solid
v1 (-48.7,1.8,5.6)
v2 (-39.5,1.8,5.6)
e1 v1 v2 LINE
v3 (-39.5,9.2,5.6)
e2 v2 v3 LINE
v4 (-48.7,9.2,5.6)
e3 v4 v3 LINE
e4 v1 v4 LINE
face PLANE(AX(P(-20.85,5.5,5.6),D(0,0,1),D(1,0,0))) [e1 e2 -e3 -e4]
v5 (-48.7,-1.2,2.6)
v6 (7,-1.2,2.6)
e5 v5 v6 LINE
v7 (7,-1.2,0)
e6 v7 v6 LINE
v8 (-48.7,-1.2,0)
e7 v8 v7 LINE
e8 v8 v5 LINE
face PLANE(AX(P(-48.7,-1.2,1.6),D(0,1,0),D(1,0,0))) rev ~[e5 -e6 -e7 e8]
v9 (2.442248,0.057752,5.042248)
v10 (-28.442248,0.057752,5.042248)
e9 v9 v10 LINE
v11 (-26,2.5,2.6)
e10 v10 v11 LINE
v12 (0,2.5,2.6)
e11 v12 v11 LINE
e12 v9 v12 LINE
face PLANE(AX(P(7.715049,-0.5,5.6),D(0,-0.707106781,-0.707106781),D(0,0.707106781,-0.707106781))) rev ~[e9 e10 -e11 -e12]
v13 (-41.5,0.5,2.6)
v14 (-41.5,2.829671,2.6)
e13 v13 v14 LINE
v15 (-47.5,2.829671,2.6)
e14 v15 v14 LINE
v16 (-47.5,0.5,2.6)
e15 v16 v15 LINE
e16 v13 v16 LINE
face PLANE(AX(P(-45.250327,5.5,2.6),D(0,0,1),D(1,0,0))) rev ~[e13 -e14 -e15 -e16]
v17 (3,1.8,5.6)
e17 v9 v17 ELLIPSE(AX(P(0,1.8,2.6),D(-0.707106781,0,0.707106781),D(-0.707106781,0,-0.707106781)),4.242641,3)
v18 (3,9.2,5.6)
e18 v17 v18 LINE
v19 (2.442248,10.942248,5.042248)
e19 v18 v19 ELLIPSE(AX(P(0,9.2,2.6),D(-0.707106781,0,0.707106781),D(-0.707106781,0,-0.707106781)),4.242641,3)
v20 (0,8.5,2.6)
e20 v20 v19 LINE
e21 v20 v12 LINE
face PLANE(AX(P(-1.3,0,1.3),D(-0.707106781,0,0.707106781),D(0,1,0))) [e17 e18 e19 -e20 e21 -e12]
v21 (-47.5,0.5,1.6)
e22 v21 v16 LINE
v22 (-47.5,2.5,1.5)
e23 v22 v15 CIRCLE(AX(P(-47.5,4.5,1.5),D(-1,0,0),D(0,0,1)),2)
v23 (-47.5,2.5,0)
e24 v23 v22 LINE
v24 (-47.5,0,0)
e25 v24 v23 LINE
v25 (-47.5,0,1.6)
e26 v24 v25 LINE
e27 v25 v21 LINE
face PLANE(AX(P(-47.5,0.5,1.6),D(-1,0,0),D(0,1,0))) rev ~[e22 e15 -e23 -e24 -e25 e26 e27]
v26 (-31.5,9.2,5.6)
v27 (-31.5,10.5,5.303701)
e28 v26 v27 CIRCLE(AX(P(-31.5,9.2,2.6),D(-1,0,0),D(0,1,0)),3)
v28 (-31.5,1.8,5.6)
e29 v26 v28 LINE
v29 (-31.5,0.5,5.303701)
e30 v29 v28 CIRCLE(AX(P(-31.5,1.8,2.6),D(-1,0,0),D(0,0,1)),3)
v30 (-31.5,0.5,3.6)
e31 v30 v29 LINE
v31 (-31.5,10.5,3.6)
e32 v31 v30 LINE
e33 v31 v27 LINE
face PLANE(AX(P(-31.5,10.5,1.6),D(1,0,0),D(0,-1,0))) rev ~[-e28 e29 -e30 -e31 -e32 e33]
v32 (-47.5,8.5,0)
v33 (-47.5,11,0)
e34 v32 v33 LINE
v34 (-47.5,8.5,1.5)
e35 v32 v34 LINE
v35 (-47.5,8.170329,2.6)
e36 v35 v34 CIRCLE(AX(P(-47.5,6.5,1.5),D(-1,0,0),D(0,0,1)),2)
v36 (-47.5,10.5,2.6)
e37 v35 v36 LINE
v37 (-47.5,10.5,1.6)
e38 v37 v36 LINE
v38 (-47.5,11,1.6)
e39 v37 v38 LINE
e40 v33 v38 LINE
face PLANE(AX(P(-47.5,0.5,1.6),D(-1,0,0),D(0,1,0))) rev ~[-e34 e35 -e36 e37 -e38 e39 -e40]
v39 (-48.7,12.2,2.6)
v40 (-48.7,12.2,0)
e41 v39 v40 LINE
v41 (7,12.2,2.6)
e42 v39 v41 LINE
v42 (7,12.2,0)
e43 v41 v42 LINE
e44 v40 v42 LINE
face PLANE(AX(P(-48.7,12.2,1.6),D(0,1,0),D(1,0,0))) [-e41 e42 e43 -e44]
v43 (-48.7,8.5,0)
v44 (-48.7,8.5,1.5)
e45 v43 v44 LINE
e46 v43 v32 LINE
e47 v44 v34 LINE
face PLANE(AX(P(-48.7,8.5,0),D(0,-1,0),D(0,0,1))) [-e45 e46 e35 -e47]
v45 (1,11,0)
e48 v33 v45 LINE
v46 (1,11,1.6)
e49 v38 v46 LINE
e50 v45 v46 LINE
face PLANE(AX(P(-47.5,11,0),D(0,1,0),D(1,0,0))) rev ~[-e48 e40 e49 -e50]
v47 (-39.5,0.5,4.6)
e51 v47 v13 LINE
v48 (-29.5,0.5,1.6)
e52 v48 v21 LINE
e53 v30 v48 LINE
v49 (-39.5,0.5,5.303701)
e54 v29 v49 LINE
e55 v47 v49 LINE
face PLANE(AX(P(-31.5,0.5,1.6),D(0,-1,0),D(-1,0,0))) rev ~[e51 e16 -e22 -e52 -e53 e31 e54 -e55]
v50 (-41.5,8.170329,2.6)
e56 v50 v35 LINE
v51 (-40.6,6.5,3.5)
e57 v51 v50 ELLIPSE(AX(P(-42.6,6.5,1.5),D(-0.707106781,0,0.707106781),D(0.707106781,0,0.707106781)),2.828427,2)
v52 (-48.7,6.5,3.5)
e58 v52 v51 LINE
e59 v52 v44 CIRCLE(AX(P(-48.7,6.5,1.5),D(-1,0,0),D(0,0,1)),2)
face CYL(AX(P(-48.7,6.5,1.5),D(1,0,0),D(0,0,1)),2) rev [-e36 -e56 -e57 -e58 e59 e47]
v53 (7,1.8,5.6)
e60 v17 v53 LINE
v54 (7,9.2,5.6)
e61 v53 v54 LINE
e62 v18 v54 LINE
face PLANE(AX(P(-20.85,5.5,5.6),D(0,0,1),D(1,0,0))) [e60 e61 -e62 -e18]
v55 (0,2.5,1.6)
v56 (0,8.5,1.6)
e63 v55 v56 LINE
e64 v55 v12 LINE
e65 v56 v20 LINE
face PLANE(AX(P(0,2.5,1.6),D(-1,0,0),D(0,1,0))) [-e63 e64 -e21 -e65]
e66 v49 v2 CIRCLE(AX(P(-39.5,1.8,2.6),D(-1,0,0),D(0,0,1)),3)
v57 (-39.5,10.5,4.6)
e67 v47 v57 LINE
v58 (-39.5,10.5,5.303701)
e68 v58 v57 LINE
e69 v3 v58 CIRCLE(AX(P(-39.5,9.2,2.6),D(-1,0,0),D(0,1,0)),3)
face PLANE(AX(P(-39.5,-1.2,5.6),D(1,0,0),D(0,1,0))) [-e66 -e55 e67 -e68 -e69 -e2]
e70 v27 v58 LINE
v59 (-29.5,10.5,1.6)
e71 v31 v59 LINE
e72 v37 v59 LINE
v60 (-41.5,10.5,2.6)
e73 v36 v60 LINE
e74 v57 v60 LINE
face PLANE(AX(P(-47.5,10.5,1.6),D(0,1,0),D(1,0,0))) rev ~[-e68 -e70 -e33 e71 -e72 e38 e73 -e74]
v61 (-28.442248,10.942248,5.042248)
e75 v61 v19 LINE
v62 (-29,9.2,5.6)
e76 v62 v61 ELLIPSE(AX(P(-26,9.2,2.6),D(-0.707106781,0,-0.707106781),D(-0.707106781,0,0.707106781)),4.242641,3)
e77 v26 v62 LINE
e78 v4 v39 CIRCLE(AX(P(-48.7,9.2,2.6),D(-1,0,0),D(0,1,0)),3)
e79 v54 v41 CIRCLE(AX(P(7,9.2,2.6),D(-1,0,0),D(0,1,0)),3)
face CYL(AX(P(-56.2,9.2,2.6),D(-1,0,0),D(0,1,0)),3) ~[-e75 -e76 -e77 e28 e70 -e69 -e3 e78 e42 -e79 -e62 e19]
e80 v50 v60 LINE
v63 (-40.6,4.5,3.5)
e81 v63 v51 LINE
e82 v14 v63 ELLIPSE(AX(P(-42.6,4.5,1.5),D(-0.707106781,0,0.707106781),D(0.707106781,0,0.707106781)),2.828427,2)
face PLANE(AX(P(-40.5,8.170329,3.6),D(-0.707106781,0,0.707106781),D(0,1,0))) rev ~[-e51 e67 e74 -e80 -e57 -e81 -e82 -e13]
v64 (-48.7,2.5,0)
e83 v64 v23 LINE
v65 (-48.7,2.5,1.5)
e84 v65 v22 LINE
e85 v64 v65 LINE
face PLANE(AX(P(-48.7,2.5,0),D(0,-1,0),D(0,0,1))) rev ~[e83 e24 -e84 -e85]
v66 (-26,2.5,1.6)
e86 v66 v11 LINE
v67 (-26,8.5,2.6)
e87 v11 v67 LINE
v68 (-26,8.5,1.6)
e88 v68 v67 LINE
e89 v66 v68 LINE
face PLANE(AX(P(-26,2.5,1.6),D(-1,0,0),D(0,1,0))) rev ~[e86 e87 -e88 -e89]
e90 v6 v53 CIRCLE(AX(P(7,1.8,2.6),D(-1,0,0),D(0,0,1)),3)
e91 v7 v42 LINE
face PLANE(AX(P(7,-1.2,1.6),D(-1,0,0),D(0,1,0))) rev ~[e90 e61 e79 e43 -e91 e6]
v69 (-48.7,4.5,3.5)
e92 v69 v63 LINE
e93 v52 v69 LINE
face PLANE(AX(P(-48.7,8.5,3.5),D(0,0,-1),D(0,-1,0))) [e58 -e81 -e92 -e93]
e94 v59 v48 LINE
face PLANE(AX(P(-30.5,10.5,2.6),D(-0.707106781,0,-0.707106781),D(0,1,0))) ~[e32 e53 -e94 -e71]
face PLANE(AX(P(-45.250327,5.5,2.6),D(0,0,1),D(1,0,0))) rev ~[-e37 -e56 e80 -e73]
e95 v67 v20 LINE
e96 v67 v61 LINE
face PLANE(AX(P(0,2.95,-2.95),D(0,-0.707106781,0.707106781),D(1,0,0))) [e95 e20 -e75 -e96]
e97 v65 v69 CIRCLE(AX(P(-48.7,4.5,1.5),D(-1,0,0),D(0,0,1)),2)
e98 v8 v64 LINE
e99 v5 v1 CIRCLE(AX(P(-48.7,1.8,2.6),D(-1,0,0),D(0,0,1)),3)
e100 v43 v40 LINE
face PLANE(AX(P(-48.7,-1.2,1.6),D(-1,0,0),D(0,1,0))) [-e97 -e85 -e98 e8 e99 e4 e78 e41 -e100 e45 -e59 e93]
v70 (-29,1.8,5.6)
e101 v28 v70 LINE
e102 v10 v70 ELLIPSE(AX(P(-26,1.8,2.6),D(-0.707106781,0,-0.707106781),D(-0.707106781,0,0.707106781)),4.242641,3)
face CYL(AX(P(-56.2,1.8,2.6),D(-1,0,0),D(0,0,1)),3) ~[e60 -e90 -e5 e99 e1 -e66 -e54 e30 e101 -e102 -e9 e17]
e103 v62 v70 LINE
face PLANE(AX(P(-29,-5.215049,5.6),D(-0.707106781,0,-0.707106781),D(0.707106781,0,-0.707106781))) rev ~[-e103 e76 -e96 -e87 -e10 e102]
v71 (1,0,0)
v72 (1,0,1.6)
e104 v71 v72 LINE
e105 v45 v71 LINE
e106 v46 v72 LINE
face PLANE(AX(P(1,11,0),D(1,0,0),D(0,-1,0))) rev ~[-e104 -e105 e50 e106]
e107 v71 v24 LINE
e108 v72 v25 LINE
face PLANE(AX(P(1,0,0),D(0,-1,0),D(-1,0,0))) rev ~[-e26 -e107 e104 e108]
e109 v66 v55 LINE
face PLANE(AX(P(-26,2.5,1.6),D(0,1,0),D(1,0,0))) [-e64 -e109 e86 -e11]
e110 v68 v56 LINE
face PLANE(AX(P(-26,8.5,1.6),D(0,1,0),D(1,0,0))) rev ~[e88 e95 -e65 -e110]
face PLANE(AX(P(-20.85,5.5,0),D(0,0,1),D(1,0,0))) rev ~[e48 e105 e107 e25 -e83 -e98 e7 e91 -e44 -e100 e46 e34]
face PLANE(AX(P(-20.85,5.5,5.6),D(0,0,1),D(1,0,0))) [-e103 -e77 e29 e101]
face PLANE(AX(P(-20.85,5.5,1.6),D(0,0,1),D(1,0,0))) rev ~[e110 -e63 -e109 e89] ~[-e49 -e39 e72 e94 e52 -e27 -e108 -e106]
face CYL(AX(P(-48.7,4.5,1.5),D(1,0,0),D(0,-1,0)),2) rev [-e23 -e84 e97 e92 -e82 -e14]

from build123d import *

# Parameters (mm, degrees)
F0_W          = 55.7
F0_H          = 13.4
F1_DEPTH      = 1.6
F2_W          = 55.7
F2_H          = 13.4
F2_W_2        = 26
F2_H_2        = 6
F3_DEPTH      = 4
F4_W          = 8
F4_H          = 10
F5_DEPTH      = 3
F6_T1_DEPTH   = 70.7
F7_W          = 6
F7_H          = 3.5
F8_DEPTH      = 10
F9_R          = 2
F10_T4_DEPTH  = 21.4300979278
F10_T10_DEPTH = 41.4300979278
F10_T16_DEPTH = 41.4300979278
F10_T22_DEPTH = 21.4300979278
F11_C1_SIZE   = 2
F11_C2_SIZE   = 2


# Not quite as in the source:
# - a fillet or chamfer that OpenCascade refuses, or shapes differently, is made with other operations: its cross-section is extruded or revolved along the edge and cut away or added


with BuildPart() as f1:
    # F0 (on Top) → F1 (new body)
    with BuildSketch(Plane.XY):
        with Locations((-20.85, 5.5)):
            Rectangle(F0_W, F0_H)
        Polygon((1, 0), (0, 0), (-47.5, 0), (-47.5, 11), (0, 11), (1, 11), align=None, mode=Mode.SUBTRACT)
    extrude(amount=F1_DEPTH)

    # F2 (on face) → F3 (join)
    with BuildSketch(Plane.XY.offset(1.6)):
        with Locations((-20.85, 5.5)):
            Rectangle(F2_W, F2_H)
        Polygon((-47.5, 0.5), (-47.5, 10.5), (-47.5, 11), (1, 11), (1, 0), (-47.5, 0), align=None, mode=Mode.SUBTRACT)
        Polygon((-47.5, 11), (-47.5, 10.5), (-31.5, 10.5), (-31.5, 0.5), (-47.5, 0.5), (-47.5, 0), (1, 0), (1, 11), align=None)
        with Locations((-13, 5.5)):
            Rectangle(F2_W_2, F2_H_2, mode=Mode.SUBTRACT)
    extrude(amount=F3_DEPTH)

    # F4 (on face) → F5 (join)
    with BuildSketch(Plane.XY.offset(5.6)):
        Polygon((-39.5, 12.2), (-48.7, 12.2), (-48.7, -1.2), (-39.5, -1.2), (-39.5, 0.5), (-47.5, 0.5), (-47.5, 10.5), (-39.5, 10.5), align=None)
        with Locations((-43.5, 5.5)):
            Rectangle(F4_W, F4_H)
    extrude(amount=-F5_DEPTH)

    # F6: fillet of radius 3 on 2 edges, made by hand

    # F6_s2 → F6_t1 (cut)
    with BuildSketch(Plane.YZ.offset(-56.2)):
        with BuildLine():
            ThreePointArc((12.2, 2.6), (11.3213203436, 4.7213203436), (9.2, 5.6))
            Line((9.2, 5.6), (12.2, 5.6))
            Line((12.2, 5.6), (12.2, 2.6))
        make_face()
        with BuildLine():
            ThreePointArc((1.8, 5.6), (-0.3213203436, 4.7213203436), (-1.2, 2.6))
            Line((-1.2, 2.6), (-1.2, 5.6))
            Line((-1.2, 5.6), (1.8, 5.6))
        make_face()
    extrude(amount=F6_T1_DEPTH, mode=Mode.SUBTRACT)

    # F7 (on face) → F8 (cut)
    with BuildSketch(Plane(origin=(-48.7, 0, 0), x_dir=(0, -1, 0), z_dir=(-1, 0, 0))):
        with Locations((-5.5, 1.75)):
            Rectangle(F7_W, F7_H)
    extrude(amount=-F8_DEPTH, mode=Mode.SUBTRACT)

    # F9
    f9_edges = [f1.edges().sort_by_distance(p)[0] for p in [
        (-44.1, 8.5, 3.5),
        (-44.1, 2.5, 3.5),
    ]]
    fillet(f9_edges, radius=F9_R)

    # F10: chamfer of 3 on 4 edges, made by hand


with BuildPart() as f10_tool2:
    # F10_s3 → F10_t4 (new body)
    with BuildSketch(Plane.XZ.offset(5.2150489639)):
        Polygon((-29, 5.6), (-26, 2.6), (-26, 5.6), align=None)
    extrude(amount=-F10_T4_DEPTH)

    split(bisect_by=Plane(origin=(0, 2.55, 2.55), x_dir=(1, 0, 0), z_dir=(0, 0.7071067812, 0.7071067812)), keep=Keep.TOP)

    split(bisect_by=Plane(origin=(0, 2.95, -2.95), x_dir=(1, 0, 0), z_dir=(0, -0.7071067812, 0.7071067812)), keep=Keep.TOP)


with BuildPart() as f1_1:
    add(f1.part)

    # F10_t1: cut F10_tool2
    add(f10_tool2.part, mode=Mode.SUBTRACT)


with BuildPart() as f10_tool8:
    # F10_s9 → F10_t10 (new body)
    with BuildSketch(Plane.YZ.offset(-33.7150489639)):
        Polygon((11.5, 5.6), (8.5, 2.6), (8.5, 5.6), align=None)
    extrude(amount=F10_T10_DEPTH)

    split(bisect_by=Plane(origin=(-11.7, 0, -11.7), x_dir=(0, 1, 0), z_dir=(0.7071067812, 0, 0.7071067812)), keep=Keep.TOP)

    split(bisect_by=Plane(origin=(-1.3, 0, 1.3), x_dir=(0, 1, 0), z_dir=(-0.7071067812, 0, 0.7071067812)), keep=Keep.TOP)


with BuildPart() as f1_2:
    add(f1_1.part)

    # F10_t7: cut F10_tool8
    add(f10_tool8.part, mode=Mode.SUBTRACT)


with BuildPart() as f10_tool14:
    # F10_s15 → F10_t16 (new body)
    with BuildSketch(Plane.YZ.offset(7.7150489639)):
        Polygon((-0.5, 5.6), (2.5, 2.6), (2.5, 5.6), align=None)
    extrude(amount=-F10_T16_DEPTH)

    split(bisect_by=Plane(origin=(-11.7, 0, -11.7), x_dir=(0, 1, 0), z_dir=(0.7071067812, 0, 0.7071067812)), keep=Keep.TOP)

    split(bisect_by=Plane(origin=(-1.3, 0, 1.3), x_dir=(0, 1, 0), z_dir=(-0.7071067812, 0, 0.7071067812)), keep=Keep.TOP)


with BuildPart() as f1_3:
    add(f1_2.part)

    # F10_t13: cut F10_tool14
    add(f10_tool14.part, mode=Mode.SUBTRACT)


with BuildPart() as f10_tool20:
    # F10_s21 → F10_t22 (new body)
    with BuildSketch(Plane.XZ.offset(-16.2150489639)):
        Polygon((3, 5.6), (0, 2.6), (0, 5.6), align=None)
    extrude(amount=F10_T22_DEPTH)

    split(bisect_by=Plane(origin=(0, 2.55, 2.55), x_dir=(1, 0, 0), z_dir=(0, 0.7071067812, 0.7071067812)), keep=Keep.TOP)

    split(bisect_by=Plane(origin=(0, 2.95, -2.95), x_dir=(1, 0, 0), z_dir=(0, -0.7071067812, 0.7071067812)), keep=Keep.TOP)


with BuildPart() as f1_4:
    add(f1_3.part)

    # F10_t19: cut F10_tool20
    add(f10_tool20.part, mode=Mode.SUBTRACT)

    # F11: chamfer of 2 on 3 edges, made by hand

    # F11_c1
    f11_c1_edges = [f1_4.edges().sort_by_distance(p)[0] for p in [
        (-31.5, 5.5, 1.6),
    ]]
    chamfer(f11_c1_edges, length=F11_C1_SIZE)

    # F11_c2
    f11_c2_edges = [f1_4.edges().sort_by_distance(p)[0] for p in [
        (-39.5, 9.3351646544, 2.6),
    ]]
    chamfer(f11_c2_edges, length=F11_C2_SIZE)


solid = f1_4.part
